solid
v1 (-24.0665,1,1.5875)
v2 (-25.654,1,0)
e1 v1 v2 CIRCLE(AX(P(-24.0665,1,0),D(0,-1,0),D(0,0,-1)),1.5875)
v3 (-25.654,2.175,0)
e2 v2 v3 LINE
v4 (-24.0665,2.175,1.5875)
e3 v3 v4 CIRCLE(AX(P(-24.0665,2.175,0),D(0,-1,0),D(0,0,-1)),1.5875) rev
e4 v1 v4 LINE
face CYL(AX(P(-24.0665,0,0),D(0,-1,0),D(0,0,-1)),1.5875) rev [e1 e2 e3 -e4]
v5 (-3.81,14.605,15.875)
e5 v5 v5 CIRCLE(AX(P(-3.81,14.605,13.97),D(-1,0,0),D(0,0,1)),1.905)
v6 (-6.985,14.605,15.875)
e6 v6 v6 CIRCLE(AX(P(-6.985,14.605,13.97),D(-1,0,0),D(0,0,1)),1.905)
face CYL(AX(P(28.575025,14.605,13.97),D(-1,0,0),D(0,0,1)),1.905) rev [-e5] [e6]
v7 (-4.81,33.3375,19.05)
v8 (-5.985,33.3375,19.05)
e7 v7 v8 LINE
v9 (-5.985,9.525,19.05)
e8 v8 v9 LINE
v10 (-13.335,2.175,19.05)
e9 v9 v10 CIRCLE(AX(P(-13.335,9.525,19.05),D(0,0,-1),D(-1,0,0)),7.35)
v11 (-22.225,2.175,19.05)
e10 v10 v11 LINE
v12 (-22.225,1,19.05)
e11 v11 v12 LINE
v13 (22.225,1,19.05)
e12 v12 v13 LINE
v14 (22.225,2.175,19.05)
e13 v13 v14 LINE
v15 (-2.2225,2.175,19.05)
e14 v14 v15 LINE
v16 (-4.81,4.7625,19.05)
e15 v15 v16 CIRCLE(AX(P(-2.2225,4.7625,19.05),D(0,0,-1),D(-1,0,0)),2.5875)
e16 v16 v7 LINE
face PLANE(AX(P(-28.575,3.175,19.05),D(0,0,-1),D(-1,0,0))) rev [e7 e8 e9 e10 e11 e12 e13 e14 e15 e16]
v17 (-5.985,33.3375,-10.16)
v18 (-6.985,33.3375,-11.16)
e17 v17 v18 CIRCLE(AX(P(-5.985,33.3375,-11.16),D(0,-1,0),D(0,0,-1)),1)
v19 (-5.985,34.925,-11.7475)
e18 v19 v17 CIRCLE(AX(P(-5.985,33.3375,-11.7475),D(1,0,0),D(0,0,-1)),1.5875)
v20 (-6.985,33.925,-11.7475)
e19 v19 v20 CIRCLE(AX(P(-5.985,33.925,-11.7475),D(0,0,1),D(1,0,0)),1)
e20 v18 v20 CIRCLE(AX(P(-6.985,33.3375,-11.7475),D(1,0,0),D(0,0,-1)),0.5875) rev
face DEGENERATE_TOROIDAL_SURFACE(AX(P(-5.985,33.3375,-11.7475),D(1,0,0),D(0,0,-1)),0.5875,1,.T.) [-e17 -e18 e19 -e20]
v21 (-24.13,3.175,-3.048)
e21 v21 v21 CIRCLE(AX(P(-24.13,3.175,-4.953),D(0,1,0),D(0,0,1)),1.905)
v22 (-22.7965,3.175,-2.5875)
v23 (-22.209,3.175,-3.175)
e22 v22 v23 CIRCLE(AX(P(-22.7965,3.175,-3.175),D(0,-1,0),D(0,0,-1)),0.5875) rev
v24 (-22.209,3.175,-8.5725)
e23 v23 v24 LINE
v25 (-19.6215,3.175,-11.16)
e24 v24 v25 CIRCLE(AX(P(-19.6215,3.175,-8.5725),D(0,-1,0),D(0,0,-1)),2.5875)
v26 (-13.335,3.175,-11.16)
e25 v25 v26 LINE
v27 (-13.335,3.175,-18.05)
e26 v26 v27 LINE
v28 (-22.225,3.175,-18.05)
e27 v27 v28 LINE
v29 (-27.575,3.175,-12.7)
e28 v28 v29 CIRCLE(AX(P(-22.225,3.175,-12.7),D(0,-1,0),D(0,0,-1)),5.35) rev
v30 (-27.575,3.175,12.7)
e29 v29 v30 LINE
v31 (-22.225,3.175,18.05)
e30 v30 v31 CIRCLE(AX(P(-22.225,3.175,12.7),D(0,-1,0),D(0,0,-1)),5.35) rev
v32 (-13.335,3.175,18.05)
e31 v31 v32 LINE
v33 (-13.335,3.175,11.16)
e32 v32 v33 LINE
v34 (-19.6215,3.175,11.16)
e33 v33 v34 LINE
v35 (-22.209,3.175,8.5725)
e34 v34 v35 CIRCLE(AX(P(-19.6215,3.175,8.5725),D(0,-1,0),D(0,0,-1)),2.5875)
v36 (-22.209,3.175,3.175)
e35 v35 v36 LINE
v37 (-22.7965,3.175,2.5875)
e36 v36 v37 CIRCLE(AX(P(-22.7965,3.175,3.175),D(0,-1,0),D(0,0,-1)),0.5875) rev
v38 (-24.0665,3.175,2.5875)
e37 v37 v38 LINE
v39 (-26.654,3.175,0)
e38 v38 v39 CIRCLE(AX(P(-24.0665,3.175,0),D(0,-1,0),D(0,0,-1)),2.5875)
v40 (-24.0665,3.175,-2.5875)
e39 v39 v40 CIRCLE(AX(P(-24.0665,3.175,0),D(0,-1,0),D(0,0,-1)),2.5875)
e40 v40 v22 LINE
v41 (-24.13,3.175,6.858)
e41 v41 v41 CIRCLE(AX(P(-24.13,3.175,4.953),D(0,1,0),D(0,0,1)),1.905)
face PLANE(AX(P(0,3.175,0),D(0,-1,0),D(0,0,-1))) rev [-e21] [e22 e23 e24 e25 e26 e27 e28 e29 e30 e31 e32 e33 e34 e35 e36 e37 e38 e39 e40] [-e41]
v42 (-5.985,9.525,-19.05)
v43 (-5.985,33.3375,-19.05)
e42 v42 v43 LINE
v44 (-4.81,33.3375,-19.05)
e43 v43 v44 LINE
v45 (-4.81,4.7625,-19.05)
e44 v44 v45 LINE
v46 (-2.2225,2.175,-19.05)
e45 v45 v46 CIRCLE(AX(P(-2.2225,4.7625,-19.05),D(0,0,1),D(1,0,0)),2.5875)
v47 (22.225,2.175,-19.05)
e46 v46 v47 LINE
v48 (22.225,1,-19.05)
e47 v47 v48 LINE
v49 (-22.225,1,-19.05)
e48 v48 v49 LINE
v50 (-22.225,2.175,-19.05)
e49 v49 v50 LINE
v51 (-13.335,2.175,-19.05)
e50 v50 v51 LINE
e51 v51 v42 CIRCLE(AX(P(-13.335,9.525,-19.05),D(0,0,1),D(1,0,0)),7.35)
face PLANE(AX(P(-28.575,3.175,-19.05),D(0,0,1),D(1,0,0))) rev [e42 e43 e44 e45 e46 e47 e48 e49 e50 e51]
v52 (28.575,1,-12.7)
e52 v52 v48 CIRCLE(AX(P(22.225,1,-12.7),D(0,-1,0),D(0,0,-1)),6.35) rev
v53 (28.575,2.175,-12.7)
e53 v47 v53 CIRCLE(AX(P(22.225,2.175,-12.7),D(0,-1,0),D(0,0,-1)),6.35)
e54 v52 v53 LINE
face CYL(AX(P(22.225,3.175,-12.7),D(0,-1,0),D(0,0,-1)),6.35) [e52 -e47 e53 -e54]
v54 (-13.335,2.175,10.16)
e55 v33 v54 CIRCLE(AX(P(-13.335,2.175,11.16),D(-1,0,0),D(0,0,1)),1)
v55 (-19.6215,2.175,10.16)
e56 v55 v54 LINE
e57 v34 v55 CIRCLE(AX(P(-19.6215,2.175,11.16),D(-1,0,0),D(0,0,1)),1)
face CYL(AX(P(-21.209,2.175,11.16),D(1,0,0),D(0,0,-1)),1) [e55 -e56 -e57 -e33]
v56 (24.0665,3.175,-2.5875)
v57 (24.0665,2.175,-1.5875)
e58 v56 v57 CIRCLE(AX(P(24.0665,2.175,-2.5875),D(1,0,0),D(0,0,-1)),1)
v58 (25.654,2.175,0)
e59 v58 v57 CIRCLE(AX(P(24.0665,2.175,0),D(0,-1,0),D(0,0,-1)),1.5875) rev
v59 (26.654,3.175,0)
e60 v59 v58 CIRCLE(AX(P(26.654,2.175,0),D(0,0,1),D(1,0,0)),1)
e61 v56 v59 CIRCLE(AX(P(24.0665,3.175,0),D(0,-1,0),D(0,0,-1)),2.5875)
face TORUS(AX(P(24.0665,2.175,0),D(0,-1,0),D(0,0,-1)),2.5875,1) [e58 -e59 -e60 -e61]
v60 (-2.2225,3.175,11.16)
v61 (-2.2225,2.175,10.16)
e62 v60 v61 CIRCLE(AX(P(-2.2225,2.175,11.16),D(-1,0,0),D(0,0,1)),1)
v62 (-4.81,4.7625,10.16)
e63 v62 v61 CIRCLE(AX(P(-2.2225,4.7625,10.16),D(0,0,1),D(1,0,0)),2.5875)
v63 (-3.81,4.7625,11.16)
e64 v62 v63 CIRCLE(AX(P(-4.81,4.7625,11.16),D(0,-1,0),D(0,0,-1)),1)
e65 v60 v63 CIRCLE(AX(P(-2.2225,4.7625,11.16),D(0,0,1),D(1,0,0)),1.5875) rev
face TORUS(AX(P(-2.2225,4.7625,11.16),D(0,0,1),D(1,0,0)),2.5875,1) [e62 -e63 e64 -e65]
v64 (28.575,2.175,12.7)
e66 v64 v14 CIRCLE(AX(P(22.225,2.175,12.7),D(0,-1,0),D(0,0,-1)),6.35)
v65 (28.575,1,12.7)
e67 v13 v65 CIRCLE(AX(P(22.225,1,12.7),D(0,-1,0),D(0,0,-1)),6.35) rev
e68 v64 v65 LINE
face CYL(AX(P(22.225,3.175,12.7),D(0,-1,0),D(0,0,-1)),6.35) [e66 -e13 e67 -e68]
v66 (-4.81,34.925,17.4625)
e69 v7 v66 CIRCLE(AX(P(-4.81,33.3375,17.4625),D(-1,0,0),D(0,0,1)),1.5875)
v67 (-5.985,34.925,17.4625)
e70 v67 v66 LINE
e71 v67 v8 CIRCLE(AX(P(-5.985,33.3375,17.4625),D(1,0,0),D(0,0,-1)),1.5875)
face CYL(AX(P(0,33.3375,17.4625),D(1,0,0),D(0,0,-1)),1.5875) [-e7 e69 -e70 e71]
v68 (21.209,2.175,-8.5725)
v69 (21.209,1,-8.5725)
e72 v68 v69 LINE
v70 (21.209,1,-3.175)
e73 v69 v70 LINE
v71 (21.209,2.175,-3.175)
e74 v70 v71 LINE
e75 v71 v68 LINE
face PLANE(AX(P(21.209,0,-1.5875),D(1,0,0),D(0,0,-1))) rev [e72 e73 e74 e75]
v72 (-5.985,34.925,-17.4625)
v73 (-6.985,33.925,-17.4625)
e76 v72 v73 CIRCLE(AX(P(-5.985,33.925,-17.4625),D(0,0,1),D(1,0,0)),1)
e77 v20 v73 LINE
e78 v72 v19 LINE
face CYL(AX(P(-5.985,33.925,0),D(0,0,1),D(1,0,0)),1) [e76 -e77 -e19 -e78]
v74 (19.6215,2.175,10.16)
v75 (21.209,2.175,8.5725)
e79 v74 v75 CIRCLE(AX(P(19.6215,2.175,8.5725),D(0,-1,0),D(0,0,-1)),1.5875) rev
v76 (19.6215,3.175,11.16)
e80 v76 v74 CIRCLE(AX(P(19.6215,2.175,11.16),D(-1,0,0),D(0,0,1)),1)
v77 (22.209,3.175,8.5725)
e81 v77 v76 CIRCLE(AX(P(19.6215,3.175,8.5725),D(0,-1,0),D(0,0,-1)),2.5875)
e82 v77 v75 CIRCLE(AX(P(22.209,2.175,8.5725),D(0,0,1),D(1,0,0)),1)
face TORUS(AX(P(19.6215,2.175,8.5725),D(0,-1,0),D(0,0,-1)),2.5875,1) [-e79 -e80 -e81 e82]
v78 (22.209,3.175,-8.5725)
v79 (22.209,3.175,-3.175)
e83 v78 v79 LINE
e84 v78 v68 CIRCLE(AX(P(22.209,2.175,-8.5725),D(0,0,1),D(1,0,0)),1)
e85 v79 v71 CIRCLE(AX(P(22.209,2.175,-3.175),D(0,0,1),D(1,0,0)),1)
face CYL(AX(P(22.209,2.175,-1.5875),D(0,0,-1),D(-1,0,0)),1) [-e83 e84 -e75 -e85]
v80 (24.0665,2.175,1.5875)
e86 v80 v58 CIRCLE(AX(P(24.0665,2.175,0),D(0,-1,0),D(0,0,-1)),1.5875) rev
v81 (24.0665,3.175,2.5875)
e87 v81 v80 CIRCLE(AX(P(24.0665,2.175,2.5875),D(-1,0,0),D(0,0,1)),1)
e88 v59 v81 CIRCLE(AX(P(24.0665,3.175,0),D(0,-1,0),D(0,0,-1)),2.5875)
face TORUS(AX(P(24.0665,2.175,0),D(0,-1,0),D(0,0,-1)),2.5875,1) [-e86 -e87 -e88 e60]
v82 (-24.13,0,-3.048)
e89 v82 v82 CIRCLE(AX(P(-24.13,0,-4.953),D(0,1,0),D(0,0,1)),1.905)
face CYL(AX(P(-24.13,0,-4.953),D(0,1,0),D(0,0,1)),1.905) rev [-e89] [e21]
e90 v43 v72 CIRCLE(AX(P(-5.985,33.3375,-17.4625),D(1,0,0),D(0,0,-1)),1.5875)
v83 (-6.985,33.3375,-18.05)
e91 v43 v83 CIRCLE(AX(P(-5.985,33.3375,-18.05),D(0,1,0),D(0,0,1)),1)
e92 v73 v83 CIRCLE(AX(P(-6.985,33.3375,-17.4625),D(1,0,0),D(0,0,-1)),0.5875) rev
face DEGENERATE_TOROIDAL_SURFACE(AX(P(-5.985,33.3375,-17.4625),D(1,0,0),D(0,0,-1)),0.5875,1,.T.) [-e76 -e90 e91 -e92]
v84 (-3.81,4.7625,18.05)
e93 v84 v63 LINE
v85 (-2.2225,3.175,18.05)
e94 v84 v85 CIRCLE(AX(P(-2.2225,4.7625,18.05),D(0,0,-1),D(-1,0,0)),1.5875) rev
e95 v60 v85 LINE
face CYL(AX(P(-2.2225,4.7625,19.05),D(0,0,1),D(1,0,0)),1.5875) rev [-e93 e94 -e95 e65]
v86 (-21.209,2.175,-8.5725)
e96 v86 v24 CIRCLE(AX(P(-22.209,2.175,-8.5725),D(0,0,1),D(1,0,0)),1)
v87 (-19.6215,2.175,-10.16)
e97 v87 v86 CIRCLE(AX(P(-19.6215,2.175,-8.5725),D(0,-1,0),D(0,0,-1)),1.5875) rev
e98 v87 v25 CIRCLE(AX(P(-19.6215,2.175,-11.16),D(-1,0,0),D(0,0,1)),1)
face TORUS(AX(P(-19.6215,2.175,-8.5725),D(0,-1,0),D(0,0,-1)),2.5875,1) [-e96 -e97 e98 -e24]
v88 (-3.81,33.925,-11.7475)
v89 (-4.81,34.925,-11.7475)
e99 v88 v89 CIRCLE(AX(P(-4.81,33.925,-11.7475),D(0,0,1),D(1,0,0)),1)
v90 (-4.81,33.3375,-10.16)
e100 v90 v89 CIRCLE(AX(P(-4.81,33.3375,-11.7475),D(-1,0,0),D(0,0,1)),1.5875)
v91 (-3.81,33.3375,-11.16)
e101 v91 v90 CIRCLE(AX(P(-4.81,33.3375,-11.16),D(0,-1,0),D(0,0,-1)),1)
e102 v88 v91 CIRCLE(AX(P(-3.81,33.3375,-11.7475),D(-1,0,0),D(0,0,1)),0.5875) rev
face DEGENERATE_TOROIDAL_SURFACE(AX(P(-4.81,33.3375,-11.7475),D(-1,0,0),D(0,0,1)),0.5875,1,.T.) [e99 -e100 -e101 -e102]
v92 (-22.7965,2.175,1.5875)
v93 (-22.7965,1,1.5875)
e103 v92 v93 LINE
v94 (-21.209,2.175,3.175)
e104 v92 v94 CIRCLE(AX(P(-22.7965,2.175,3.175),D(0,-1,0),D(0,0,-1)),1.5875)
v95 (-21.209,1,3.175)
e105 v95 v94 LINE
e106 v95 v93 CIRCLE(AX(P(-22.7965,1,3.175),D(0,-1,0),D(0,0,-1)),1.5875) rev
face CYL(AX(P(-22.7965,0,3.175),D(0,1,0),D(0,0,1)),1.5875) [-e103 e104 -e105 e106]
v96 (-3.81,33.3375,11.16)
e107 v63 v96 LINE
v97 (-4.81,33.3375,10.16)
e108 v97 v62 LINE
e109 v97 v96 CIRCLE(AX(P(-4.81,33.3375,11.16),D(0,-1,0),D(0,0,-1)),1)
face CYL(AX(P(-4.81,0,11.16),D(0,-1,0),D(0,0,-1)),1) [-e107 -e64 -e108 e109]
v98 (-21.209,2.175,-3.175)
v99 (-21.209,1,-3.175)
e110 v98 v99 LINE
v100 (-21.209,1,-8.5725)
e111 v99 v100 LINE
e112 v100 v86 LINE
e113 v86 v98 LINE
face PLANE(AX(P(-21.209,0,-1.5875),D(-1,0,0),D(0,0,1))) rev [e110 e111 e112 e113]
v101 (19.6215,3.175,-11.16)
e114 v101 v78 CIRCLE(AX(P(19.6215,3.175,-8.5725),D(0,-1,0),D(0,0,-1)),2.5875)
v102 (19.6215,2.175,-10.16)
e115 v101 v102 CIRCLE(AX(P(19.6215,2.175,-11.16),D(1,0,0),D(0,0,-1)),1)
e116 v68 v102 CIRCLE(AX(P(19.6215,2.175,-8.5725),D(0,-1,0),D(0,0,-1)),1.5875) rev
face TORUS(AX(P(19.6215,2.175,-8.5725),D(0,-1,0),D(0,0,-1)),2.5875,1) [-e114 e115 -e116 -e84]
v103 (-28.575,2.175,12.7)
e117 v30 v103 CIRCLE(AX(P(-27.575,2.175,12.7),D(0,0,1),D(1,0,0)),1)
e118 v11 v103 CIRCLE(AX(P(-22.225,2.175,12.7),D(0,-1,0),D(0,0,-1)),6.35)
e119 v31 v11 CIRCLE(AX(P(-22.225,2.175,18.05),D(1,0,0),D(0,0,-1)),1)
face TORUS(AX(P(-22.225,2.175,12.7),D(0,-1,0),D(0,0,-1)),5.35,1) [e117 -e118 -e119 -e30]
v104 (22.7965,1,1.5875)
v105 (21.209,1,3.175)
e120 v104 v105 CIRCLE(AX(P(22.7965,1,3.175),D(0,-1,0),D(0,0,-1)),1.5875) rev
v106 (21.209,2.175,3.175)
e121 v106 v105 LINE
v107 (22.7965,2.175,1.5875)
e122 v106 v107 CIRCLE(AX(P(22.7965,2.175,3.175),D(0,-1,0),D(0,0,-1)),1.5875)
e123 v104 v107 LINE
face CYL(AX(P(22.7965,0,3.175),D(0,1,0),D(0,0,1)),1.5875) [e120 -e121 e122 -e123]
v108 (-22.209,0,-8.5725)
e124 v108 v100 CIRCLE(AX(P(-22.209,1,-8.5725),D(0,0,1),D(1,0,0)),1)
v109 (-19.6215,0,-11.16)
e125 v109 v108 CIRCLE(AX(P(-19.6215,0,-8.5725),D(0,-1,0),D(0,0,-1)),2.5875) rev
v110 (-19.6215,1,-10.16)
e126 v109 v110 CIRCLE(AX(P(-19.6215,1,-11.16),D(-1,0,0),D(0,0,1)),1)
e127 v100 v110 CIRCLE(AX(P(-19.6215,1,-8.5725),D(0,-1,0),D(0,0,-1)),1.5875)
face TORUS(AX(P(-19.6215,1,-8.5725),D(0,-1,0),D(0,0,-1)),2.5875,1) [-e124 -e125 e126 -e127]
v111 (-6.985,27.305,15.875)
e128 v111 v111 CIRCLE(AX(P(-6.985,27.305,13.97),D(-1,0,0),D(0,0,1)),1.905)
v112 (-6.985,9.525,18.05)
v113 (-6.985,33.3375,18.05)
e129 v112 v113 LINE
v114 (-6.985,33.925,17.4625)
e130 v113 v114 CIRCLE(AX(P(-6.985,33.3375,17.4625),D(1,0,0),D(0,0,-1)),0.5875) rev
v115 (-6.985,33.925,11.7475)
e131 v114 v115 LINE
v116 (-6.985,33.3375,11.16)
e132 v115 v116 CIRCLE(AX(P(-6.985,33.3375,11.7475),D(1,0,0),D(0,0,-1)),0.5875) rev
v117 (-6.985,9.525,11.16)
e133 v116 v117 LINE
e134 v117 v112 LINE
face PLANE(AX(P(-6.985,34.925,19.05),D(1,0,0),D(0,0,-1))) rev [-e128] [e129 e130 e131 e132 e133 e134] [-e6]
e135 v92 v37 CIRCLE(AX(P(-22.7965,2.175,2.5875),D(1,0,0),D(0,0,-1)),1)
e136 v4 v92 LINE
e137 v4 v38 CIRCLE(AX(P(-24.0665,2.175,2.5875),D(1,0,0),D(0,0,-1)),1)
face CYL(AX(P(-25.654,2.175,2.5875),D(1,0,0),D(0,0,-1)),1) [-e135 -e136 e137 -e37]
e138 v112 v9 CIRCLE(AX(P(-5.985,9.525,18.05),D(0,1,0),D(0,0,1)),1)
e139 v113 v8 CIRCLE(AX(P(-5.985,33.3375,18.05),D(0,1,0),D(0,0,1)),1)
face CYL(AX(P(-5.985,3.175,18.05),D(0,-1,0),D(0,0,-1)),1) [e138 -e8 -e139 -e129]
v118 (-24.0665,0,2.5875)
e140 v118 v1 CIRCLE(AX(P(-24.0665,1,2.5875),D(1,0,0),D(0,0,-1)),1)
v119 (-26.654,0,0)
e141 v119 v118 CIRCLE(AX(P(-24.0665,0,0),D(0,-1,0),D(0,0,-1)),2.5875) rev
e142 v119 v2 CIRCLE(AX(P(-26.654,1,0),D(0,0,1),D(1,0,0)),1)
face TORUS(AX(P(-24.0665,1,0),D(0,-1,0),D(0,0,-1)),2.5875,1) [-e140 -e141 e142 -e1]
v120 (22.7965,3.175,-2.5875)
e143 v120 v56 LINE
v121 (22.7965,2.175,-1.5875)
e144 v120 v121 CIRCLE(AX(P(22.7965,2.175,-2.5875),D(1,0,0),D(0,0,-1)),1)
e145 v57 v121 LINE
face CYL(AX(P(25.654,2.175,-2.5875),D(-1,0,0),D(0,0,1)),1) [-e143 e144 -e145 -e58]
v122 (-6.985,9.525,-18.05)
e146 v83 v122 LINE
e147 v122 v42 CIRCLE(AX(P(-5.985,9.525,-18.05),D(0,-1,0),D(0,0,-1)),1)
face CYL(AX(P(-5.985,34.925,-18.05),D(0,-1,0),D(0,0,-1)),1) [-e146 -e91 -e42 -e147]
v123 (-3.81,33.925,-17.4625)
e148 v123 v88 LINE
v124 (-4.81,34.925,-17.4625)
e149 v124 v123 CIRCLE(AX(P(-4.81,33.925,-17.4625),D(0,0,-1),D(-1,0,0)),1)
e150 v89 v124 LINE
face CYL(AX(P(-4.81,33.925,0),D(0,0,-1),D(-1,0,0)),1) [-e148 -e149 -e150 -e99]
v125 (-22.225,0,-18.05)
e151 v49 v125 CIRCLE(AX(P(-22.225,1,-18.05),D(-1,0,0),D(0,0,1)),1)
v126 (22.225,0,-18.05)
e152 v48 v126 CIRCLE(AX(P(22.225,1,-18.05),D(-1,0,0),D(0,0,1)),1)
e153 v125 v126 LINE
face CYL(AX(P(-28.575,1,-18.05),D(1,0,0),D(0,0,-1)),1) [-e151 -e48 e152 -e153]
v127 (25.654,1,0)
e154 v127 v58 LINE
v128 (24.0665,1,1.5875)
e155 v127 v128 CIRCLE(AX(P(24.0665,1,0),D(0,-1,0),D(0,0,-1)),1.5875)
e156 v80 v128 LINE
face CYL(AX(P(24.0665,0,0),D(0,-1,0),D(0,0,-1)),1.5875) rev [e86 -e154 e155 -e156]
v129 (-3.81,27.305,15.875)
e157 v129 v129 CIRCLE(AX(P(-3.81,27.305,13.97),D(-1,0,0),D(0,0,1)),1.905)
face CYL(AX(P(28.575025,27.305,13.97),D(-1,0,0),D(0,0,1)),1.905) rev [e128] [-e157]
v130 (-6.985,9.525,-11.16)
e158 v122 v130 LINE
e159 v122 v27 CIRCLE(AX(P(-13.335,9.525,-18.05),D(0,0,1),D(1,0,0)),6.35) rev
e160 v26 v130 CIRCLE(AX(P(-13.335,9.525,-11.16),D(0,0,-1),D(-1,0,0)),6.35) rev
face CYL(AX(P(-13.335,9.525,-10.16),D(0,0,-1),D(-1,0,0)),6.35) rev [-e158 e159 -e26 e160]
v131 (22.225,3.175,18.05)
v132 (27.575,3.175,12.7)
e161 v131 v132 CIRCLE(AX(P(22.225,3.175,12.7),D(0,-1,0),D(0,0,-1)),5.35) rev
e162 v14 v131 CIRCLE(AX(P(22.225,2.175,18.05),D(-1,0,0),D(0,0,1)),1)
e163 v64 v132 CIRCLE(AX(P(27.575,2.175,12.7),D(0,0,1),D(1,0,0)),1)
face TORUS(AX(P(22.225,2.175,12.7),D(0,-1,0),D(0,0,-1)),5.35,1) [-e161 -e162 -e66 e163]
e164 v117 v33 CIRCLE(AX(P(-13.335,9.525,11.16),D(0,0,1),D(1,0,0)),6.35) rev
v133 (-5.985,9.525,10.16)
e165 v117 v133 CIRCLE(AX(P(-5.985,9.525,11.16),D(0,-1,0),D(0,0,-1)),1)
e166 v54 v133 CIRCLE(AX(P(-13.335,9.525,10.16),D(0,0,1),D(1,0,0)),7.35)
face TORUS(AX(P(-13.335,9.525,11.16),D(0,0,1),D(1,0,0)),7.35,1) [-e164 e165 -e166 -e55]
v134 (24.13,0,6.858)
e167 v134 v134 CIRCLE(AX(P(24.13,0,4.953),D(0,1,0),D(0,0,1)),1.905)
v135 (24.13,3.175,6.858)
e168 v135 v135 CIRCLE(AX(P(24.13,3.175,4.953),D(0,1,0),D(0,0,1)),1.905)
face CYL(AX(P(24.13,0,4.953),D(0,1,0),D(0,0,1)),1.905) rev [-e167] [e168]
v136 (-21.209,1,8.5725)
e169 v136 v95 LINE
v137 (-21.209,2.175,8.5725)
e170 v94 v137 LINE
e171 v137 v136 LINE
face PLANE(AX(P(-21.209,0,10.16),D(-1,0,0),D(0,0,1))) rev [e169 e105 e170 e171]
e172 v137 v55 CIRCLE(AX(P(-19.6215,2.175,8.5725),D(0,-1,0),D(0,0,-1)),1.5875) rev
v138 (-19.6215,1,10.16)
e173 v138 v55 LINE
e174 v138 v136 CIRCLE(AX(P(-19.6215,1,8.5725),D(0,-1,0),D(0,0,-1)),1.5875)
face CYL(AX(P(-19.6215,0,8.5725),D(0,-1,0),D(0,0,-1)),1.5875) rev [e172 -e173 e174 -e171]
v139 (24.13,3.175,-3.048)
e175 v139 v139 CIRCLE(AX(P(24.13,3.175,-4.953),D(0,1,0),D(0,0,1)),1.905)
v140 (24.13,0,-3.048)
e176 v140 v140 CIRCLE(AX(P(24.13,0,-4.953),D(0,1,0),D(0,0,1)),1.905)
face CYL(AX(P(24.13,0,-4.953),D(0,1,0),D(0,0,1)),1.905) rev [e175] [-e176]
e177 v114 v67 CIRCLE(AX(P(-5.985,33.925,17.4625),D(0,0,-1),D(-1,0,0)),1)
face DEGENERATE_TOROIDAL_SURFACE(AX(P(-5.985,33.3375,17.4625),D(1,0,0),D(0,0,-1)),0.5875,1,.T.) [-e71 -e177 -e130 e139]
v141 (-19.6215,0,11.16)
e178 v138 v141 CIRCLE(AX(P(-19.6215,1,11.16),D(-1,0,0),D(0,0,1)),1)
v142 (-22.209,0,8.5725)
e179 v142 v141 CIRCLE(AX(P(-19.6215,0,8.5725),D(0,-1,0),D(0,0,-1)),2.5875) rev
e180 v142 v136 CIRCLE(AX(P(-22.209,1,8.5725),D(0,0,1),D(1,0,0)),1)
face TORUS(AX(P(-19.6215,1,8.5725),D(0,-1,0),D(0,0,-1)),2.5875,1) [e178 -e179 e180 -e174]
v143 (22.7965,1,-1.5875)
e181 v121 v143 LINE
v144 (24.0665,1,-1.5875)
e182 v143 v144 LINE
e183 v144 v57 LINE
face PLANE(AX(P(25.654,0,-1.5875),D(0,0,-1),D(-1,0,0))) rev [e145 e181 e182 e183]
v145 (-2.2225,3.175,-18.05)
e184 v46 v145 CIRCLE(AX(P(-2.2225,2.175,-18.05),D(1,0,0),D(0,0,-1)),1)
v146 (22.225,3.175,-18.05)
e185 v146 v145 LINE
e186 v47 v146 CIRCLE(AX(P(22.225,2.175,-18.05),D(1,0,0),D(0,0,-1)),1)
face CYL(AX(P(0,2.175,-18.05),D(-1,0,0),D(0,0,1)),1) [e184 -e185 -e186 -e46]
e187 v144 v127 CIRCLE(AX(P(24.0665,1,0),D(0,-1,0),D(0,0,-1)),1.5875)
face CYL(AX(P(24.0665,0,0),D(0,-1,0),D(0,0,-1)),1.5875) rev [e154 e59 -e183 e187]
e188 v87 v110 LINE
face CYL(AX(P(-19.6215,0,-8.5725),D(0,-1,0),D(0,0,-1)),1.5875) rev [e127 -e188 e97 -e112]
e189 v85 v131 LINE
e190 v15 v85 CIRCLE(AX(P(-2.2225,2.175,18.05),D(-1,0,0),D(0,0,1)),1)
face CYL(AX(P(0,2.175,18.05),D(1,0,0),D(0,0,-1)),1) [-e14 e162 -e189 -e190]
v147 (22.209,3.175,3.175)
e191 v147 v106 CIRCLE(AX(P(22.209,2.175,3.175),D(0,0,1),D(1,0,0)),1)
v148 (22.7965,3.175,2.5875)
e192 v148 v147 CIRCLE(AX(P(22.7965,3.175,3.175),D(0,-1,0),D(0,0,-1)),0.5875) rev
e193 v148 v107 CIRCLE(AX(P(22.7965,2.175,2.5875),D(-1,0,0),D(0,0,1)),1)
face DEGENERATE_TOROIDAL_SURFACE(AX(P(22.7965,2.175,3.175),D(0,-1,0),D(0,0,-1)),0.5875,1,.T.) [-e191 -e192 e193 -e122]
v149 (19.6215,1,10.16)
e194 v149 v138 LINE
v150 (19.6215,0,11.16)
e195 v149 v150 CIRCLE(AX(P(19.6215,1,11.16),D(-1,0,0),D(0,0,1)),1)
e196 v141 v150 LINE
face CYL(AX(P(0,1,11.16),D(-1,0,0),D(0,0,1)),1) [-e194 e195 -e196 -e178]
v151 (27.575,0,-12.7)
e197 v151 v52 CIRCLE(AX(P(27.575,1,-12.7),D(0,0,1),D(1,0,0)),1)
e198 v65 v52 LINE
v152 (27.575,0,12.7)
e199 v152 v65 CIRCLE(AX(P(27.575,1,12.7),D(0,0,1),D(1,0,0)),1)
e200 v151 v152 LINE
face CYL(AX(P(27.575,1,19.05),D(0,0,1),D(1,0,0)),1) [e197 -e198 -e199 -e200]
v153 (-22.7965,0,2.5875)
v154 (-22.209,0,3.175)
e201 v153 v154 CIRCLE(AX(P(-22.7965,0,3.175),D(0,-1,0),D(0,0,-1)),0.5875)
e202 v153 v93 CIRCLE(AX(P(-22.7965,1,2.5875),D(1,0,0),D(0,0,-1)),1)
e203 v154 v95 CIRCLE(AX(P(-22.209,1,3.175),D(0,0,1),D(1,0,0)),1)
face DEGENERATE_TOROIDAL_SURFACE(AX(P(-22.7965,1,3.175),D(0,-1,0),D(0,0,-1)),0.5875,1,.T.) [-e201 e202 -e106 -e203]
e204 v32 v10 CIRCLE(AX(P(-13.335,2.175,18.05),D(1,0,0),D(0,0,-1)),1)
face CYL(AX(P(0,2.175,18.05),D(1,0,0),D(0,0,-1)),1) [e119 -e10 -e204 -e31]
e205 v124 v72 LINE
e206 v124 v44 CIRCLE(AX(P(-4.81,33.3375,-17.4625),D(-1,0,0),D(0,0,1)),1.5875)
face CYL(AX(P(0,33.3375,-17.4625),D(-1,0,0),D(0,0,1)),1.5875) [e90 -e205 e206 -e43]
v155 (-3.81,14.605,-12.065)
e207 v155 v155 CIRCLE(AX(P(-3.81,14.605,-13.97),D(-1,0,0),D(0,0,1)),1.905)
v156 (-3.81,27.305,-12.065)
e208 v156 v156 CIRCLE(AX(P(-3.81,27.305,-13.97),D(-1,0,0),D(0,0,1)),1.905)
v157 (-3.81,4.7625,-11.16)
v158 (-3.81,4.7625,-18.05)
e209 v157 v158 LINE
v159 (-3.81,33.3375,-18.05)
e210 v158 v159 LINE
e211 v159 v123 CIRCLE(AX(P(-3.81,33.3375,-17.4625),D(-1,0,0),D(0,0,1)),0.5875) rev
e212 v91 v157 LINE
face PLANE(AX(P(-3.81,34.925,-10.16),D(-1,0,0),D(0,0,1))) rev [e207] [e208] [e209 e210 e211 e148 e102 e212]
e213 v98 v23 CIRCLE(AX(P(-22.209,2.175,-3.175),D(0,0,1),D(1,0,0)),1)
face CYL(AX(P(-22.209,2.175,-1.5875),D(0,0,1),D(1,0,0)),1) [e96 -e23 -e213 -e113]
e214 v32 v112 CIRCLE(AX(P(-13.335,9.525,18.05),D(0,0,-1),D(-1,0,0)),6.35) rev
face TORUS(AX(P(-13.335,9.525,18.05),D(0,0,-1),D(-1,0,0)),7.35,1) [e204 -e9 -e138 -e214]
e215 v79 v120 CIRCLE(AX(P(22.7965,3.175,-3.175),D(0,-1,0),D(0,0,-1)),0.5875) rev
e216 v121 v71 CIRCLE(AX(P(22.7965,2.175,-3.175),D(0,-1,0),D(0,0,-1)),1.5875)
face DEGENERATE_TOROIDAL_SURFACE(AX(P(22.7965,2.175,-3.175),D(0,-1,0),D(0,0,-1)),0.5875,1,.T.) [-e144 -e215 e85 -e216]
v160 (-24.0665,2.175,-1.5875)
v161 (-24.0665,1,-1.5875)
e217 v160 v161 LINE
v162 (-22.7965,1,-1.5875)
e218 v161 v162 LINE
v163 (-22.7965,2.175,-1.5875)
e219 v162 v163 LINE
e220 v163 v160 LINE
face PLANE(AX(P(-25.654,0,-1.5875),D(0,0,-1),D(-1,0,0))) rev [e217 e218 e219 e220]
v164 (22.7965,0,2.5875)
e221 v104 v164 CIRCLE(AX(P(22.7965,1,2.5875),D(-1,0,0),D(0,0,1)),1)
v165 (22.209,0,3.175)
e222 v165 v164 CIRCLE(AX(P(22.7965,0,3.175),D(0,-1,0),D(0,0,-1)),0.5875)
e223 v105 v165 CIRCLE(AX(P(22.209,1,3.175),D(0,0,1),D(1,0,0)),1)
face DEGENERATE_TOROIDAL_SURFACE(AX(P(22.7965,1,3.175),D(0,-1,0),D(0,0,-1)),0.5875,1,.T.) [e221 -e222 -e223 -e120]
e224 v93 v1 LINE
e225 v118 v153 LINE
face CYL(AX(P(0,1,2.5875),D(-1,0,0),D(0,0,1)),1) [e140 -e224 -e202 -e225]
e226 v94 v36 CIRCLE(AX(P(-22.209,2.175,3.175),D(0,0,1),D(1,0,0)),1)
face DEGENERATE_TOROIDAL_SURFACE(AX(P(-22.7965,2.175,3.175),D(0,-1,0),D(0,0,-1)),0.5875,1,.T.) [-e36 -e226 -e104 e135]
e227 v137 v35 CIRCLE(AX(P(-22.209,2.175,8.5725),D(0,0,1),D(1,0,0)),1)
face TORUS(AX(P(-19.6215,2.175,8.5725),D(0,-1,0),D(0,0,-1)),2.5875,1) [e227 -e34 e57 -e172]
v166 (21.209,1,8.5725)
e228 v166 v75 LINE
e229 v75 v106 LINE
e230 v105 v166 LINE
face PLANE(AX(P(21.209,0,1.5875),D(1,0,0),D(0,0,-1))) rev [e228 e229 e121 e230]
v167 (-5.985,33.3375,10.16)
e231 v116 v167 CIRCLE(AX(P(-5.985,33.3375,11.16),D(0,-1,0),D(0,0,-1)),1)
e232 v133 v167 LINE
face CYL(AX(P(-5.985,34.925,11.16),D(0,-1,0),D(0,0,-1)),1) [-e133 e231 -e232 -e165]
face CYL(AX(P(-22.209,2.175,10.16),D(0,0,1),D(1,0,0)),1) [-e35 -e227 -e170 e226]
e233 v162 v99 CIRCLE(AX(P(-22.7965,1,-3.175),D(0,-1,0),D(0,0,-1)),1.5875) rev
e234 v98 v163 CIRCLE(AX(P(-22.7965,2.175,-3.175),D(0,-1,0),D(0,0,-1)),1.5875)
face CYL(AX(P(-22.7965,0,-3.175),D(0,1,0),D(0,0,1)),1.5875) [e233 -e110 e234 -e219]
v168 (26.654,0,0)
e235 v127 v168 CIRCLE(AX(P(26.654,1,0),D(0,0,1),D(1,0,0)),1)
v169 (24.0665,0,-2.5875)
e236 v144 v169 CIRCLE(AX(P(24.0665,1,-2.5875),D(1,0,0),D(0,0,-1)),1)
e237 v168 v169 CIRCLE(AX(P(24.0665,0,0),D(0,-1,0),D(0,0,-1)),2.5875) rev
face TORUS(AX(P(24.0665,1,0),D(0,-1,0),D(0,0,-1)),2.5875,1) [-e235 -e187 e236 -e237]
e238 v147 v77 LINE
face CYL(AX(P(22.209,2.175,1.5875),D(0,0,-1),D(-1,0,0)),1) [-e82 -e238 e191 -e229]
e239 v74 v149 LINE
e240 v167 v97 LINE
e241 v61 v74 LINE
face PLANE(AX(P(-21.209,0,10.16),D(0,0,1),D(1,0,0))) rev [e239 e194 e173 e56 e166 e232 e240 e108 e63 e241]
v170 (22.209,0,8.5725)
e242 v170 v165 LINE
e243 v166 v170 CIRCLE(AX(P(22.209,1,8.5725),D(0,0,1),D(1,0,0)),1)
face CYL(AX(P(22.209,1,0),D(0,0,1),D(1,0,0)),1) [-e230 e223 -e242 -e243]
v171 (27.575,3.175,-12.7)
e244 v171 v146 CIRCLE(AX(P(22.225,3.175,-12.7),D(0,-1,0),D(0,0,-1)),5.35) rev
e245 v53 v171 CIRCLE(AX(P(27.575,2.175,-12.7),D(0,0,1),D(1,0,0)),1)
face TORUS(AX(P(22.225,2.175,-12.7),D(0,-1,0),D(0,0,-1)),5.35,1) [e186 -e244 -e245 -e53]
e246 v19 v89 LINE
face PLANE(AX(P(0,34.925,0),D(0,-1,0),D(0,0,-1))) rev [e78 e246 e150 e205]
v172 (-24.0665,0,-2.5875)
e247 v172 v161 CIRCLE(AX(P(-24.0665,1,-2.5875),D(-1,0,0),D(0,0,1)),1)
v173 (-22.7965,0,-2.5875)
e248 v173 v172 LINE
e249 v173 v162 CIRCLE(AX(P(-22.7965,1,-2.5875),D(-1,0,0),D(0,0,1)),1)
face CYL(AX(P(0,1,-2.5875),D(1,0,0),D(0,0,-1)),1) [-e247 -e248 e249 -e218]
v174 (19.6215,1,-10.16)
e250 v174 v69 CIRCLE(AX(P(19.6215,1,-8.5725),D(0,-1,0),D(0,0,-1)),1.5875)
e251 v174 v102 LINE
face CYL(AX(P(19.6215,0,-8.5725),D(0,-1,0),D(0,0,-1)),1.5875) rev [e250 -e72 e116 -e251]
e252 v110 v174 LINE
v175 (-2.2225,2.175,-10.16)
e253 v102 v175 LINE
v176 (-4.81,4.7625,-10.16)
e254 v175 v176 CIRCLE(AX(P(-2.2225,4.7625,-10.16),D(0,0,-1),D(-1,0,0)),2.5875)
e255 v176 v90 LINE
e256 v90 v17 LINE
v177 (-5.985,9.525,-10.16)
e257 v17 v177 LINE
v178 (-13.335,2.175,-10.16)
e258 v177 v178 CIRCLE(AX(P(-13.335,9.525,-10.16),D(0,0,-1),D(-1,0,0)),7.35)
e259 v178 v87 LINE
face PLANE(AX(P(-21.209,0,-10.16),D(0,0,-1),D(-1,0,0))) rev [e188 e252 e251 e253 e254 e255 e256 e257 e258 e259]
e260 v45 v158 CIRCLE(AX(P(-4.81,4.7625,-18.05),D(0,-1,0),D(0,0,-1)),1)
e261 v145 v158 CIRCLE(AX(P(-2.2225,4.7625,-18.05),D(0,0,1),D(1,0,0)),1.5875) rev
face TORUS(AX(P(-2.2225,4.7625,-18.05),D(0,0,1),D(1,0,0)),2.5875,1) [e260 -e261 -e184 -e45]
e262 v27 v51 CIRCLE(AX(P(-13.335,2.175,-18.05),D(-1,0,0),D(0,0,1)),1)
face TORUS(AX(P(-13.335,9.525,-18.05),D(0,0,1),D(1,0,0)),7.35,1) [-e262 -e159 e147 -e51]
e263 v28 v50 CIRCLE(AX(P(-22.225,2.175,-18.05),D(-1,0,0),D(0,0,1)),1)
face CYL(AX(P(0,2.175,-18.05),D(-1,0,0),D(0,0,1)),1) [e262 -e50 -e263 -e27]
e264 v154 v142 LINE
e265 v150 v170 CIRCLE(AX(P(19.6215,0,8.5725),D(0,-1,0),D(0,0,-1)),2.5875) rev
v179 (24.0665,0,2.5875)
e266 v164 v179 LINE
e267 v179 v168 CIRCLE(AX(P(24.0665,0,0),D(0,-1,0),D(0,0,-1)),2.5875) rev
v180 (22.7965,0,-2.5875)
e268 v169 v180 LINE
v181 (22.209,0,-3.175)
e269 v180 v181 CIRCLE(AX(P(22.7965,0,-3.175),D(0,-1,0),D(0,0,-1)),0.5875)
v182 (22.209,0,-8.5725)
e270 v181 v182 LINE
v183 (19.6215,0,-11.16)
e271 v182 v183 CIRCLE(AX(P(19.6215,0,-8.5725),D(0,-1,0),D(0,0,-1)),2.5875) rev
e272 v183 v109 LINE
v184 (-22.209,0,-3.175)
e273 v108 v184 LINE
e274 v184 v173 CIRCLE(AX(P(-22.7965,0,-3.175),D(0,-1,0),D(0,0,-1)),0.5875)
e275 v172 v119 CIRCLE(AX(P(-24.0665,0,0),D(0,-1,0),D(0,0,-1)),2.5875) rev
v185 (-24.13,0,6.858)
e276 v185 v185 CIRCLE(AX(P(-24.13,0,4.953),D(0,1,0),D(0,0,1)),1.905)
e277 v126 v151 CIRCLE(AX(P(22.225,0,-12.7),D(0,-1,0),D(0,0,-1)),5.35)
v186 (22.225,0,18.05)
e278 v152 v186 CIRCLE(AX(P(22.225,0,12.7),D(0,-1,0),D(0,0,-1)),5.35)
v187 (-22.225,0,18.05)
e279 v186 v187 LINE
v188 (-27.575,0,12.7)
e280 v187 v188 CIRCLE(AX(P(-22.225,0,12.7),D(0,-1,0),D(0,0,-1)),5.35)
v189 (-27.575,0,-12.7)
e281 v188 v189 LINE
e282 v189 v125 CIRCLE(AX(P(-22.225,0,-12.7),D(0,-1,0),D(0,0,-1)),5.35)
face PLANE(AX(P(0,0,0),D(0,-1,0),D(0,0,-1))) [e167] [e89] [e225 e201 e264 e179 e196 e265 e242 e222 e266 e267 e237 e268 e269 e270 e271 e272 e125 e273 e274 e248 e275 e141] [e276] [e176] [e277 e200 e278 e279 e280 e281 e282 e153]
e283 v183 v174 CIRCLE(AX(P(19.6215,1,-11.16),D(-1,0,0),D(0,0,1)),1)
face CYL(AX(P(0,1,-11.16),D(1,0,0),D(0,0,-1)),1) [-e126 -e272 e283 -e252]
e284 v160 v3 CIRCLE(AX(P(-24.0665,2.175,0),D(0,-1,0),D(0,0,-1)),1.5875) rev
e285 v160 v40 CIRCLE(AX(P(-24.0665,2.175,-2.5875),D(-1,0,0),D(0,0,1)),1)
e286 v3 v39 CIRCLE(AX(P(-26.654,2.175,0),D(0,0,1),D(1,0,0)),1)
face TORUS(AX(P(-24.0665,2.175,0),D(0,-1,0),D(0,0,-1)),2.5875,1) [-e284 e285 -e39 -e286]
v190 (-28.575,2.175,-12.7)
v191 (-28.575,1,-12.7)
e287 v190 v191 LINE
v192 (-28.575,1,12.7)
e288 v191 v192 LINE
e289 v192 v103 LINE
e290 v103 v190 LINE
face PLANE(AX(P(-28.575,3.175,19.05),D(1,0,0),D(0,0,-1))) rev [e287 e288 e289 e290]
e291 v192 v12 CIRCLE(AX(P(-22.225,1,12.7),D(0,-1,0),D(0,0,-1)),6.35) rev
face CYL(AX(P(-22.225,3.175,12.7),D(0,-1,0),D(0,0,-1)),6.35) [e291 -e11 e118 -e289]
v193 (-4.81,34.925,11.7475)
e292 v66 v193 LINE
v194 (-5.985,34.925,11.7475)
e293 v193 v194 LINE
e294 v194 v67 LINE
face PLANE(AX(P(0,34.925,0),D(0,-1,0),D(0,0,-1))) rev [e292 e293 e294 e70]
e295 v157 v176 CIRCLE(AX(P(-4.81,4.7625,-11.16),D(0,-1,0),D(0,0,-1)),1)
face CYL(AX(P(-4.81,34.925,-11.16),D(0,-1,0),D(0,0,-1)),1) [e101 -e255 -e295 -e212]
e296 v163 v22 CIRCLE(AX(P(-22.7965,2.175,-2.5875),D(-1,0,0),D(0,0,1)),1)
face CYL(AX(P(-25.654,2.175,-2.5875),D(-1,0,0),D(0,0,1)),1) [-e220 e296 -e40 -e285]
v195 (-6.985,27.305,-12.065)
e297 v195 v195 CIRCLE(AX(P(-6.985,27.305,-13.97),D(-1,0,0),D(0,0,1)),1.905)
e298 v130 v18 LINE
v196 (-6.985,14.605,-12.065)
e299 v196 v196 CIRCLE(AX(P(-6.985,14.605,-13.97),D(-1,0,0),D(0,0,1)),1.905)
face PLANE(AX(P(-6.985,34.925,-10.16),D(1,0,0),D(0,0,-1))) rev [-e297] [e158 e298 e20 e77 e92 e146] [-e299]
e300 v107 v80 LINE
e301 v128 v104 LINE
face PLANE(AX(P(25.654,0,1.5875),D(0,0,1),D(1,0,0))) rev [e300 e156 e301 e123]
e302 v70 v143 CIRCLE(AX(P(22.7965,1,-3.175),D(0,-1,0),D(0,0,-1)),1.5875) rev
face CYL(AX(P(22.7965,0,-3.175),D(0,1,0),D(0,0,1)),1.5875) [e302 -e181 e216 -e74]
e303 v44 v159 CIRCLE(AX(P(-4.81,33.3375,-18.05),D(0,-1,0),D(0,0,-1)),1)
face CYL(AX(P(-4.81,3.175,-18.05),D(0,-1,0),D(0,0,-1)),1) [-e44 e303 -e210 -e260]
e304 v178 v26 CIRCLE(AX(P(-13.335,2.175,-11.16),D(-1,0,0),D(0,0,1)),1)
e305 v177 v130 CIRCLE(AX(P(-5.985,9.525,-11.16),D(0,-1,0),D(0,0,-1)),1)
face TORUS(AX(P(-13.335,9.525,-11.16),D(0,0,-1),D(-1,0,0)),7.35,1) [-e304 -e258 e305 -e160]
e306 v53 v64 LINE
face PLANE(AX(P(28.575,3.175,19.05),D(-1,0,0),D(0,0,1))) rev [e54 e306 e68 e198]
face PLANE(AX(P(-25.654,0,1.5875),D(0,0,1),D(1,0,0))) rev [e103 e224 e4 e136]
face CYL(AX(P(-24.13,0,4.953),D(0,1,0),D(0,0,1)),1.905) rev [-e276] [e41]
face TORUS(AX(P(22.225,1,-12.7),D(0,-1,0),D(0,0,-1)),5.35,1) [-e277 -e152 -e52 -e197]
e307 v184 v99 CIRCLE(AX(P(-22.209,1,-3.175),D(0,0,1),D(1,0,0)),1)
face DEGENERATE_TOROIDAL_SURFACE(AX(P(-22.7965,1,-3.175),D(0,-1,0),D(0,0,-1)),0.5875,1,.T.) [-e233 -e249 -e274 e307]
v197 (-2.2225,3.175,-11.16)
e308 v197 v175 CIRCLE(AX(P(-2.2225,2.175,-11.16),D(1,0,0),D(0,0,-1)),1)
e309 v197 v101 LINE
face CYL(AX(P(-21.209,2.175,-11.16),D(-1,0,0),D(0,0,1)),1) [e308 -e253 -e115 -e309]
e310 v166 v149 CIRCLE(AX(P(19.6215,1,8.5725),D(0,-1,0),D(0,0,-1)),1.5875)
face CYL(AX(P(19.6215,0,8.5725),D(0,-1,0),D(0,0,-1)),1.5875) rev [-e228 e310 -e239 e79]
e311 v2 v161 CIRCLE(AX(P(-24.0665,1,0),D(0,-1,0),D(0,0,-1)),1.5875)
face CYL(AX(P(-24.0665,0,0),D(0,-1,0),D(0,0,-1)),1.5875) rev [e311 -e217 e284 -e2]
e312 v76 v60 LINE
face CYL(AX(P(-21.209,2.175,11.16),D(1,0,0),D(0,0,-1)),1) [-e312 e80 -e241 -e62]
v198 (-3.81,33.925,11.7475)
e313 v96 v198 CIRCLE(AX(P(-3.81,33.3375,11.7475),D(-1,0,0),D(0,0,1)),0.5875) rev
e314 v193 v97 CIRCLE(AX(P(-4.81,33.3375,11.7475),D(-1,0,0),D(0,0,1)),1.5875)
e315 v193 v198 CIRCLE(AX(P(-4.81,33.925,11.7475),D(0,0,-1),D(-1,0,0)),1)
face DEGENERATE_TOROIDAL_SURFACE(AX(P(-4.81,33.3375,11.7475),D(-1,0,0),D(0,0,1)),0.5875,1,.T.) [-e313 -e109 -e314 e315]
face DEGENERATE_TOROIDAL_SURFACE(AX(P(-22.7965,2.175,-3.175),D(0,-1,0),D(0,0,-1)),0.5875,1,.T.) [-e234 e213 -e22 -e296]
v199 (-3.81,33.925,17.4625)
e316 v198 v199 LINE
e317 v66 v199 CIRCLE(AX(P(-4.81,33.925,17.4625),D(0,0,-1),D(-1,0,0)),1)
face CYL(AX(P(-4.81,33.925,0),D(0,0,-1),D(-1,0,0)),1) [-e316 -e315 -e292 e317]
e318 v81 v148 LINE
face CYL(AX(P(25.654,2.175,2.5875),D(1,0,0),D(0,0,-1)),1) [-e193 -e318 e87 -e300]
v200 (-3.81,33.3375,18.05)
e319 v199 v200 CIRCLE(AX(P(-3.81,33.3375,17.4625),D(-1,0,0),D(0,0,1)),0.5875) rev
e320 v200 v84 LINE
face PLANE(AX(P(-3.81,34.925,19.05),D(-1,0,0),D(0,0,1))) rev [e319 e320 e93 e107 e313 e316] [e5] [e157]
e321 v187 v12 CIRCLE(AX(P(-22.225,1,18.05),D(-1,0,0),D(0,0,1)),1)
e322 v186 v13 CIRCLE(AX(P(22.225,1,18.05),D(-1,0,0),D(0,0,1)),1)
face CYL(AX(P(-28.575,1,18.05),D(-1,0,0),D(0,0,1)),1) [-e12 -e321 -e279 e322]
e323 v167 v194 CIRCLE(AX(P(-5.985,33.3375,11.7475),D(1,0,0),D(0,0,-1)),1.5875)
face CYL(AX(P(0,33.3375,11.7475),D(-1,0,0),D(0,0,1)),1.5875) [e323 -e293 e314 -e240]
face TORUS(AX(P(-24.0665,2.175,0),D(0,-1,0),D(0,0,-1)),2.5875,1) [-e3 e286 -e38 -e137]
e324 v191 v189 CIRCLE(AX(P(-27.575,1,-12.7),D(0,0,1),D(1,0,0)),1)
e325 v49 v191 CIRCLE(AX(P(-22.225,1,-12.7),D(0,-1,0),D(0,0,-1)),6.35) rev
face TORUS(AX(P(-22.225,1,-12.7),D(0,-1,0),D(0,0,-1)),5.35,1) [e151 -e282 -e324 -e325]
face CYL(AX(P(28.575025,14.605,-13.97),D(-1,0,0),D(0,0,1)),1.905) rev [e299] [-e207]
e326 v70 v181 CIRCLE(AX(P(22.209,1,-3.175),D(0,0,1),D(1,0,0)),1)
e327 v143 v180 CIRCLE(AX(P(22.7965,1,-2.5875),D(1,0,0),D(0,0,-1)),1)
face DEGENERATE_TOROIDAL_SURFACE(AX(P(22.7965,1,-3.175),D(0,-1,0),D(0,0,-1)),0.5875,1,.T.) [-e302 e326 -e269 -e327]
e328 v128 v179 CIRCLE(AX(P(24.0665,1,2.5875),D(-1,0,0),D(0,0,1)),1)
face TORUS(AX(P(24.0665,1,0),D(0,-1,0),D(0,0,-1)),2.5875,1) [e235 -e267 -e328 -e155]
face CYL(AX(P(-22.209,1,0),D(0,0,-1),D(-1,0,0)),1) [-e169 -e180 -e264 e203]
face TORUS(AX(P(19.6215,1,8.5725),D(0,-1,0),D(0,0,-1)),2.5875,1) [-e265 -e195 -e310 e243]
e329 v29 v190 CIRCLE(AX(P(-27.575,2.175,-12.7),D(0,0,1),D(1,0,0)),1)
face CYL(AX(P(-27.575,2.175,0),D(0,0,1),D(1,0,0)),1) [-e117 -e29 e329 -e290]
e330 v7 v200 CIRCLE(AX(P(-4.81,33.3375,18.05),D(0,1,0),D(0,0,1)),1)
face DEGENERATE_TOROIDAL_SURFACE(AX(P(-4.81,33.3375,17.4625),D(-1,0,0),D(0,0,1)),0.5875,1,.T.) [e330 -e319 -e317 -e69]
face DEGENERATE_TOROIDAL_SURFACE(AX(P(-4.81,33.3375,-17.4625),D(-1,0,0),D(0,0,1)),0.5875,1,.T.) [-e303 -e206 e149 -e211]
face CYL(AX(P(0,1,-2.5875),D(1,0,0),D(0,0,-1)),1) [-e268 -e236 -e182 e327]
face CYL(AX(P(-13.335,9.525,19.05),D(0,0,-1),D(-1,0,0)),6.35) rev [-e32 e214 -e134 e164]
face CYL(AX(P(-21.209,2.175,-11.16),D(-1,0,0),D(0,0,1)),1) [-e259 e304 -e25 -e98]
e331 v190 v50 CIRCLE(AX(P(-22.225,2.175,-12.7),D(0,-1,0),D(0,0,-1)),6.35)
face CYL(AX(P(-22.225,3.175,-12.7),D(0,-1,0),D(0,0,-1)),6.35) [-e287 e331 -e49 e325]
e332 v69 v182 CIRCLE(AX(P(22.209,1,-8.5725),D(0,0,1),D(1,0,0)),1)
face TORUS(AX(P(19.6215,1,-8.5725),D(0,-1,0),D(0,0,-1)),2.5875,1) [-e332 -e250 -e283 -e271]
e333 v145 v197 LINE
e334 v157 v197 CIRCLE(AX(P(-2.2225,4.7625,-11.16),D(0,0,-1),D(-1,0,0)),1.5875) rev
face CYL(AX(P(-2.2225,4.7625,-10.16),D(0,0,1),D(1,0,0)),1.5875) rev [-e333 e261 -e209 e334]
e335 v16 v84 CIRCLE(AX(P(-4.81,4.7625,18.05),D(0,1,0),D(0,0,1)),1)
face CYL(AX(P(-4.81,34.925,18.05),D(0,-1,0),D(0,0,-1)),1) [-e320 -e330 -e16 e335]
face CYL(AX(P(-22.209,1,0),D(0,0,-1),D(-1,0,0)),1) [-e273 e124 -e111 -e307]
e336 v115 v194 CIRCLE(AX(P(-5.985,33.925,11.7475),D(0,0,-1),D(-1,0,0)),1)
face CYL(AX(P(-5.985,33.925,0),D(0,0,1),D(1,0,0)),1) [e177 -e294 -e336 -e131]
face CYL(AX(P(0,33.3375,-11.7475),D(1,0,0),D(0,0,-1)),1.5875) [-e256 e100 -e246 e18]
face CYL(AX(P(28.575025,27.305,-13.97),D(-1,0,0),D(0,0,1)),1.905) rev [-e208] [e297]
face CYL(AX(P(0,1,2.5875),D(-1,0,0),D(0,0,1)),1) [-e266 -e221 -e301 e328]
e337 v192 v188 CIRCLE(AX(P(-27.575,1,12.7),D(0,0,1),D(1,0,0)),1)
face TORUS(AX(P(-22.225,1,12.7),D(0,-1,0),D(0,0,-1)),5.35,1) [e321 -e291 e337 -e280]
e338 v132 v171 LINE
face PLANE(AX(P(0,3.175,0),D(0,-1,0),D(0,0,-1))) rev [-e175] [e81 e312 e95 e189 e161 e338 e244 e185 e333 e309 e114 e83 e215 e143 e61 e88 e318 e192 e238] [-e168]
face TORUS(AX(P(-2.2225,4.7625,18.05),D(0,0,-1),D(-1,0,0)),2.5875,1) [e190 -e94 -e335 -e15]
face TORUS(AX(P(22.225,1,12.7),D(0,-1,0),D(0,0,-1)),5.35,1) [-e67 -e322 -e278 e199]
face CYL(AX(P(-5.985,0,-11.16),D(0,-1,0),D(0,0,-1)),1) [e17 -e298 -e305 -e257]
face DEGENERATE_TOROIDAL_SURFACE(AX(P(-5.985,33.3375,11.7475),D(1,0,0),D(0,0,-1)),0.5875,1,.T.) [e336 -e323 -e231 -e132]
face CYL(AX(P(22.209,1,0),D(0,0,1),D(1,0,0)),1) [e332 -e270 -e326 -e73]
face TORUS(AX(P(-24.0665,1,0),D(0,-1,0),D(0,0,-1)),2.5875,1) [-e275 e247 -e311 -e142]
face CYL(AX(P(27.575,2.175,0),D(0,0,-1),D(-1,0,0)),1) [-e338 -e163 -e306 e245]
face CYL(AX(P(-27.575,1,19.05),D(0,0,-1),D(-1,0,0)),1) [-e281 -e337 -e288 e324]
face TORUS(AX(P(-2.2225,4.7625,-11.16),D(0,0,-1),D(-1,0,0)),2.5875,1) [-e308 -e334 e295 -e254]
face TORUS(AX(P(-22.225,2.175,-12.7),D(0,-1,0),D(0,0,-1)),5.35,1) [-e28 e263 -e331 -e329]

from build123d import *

# Parameters (mm, degrees)
SKETCH1_W           = 57.15
SKETCH1_H           = 38.1
BOSS_EXTRUDE1_DEPTH = 3.175
SKETCH2_R           = 1.905
CUT_EXTRUDE1_DEPTH  = 35.48932806
SKETCH3_W           = 3.175
SKETCH3_H           = 8.89
BOSS_EXTRUDE2_DEPTH = 31.75
SKETCH4_R           = 1.905
CUT_EXTRUDE2_DEPTH  = 54.358895463
FILLET1_R           = 1.5875
FILLET2_R           = 6.35
FILLET3_R           = 1


with BuildPart() as part:
    # Sketch1 → Boss-Extrude1 (new body)
    with BuildSketch(Plane(origin=(0, 0, 0), x_dir=(1, 0, 0), z_dir=(0, 1, 0))):
        Rectangle(SKETCH1_W, SKETCH1_H)
    extrude(amount=BOSS_EXTRUDE1_DEPTH)

    # Sketch2 → Cut-Extrude1 (cut, through all)
    with BuildSketch(Plane(origin=(0, 3.175, 0), x_dir=(1, 0, 0), z_dir=(0, 1, 0))):
        with Locations(Location((-24.13, -4.953, 0), (0, 0, 270))):
            Circle(SKETCH2_R)
        with Locations(Location((-24.13, 4.953, 0), (0, 0, 270))):
            Circle(SKETCH2_R)
        with Locations(Location((24.13, 4.953, 0), (0, 0, 270))):
            Circle(SKETCH2_R)
        with Locations(Location((24.13, -4.953, 0), (0, 0, 270))):
            Circle(SKETCH2_R)
        Polygon((-21.209, -10.16), (21.209, -10.16), (21.209, -1.5875), (25.654, -1.5875), (25.654, 1.5875), (21.209, 1.5875), (21.209, 10.16), (-21.209, 10.16), (-21.209, 1.5875), (-25.654, 1.5875), (-25.654, -1.5875), (-21.209, -1.5875), align=None)
    extrude(amount=-CUT_EXTRUDE1_DEPTH, mode=Mode.SUBTRACT)

    # Sketch3 → Boss-Extrude2 (add)
    with BuildSketch(Plane(origin=(0, 3.175, 0), x_dir=(1, 0, 0), z_dir=(0, 1, 0))):
        with Locations((-5.3975, -14.605)):
            Rectangle(SKETCH3_W, SKETCH3_H)
        with Locations((-5.3975, 14.605)):
            Rectangle(SKETCH3_W, SKETCH3_H)
    extrude(amount=BOSS_EXTRUDE2_DEPTH)

    # Sketch4 → Cut-Extrude2 (cut, through all)
    with BuildSketch(Plane.ZY.offset(6.985)):
        with Locations((13.97, 27.305)):
            Circle(SKETCH4_R)
        with Locations((-13.97, 27.305)):
            Circle(SKETCH4_R)
        with Locations((-13.97, 14.605)):
            Circle(SKETCH4_R)
        with Locations((13.97, 14.605)):
            Circle(SKETCH4_R)
    extrude(amount=-CUT_EXTRUDE2_DEPTH, mode=Mode.SUBTRACT)

    # Fillet1
    fillet1_edges = [part.edges().sort_by_distance(p)[0] for p in [
        (-3.81, 3.175, -14.605),
        (-3.81, 3.175, 14.605),
        (-21.209, 1.5875, -10.16),
        (-21.209, 1.5875, 10.16),
        (-21.209, 1.5875, -1.5875),
        (-21.209, 1.5875, 1.5875),
        (-25.654, 1.5875, 1.5875),
        (-25.654, 1.5875, -1.5875),
        (21.209, 1.5875, -10.16),
        (21.209, 1.5875, -1.5875),
        (25.654, 1.5875, -1.5875),
        (25.654, 1.5875, 1.5875),
        (21.209, 1.5875, 1.5875),
        (21.209, 1.5875, 10.16),
        (-5.3975, 34.925, -10.16),
        (-5.3975, 34.925, -19.05),
        (-5.3975, 34.925, 19.05),
        (-5.3975, 34.925, 10.16),
    ]]
    fillet(fillet1_edges, radius=FILLET1_R - 0.0001)  # a hair under: the kernel refuses the full size

    # Fillet2
    fillet2_edges = [part.edges().sort_by_distance(p)[0] for p in [
        (-6.985, 3.175, -14.605),
        (-6.985, 3.175, 14.605),
        (28.575, 1.5875, 19.05),
        (28.575, 1.5875, -19.05),
        (-28.575, 1.5875, -19.05),
        (-28.575, 1.5875, 19.05),
    ]]
    fillet(fillet2_edges, radius=FILLET2_R)

    # Fillet3
    fillet3_edges = [part.edges().sort_by_distance(p)[0] for p in [
        (-6.985, 34.925, -14.605),
        (-3.81, 34.925, -14.605),
        (-3.81, 19.05, -19.05),
        (-3.81, 19.05, -10.16),
        (-3.81, 34.460061304, -18.585061304),
        (-3.81, 34.460061304, -10.624938696),
        (8.6995, 3.175, -10.16),
        (-6.985, 21.4313, -10.16),
        (0, 0, -10.16),
        (-6.985, 21.4313, -19.05),
        (-6.985, 34.460061304, -18.585061304),
        (-6.985, 34.460061304, -10.624938696),
        (-6.985, 34.925, 14.605),
        (-3.81, 34.925, 14.605),
        (-3.81, 19.05, 10.16),
        (-3.81, 19.05, 19.05),
        (-3.81, 34.460061304, 10.624938696),
        (-3.81, 34.460061304, 18.585061304),
        (10.0012, 3.175, 19.05),
        (-6.985, 21.4313, 19.05),
        (-6.985, 21.4313, 10.16),
        (-6.985, 34.460061304, 10.624938696),
        (-6.985, 34.460061304, 18.585061304),
        (-16.4783, 3.175, 10.16),
        (8.6995, 3.175, 10.16),
        (0, 0, 10.16),
        (21.209, 3.175, -5.87375),
        (23.4315, 3.175, -1.5875),
        (23.4315, 3.175, 1.5875),
        (21.209, 3.175, 5.87375),
        (21.673938696, 3.175, 2.052438696),
        (21.673938696, 3.175, -2.052438696),
        (-21.209, 3.175, -5.87375),
        (-21.209, 0, -5.87375),
        (-21.209, 3.175, 5.87375),
        (-21.209, 0, 5.87375),
        (-23.4315, 3.175, -1.5875),
        (-23.4315, 0, -1.5875),
        (-23.4315, 3.175, 1.5875),
        (-21.673938696, 3.175, 2.052438696),
        (-21.673938696, 3.175, -2.052438696),
        (21.209, 0, -5.87375),
        (-23.4315, 0, 1.5875),
        (21.209, 0, 5.87375),
        (23.4315, 0, 1.5875),
        (23.4315, 0, -1.5875),
        (21.673938696, 0, 2.052438696),
        (21.673938696, 0, -2.052438696),
        (-21.673938696, 0, 2.052438696),
        (-21.673938696, 0, -2.052438696),
        (-3.345061304, 3.639938696, -19.05),
        (-3.345061304, 3.639938696, -10.16),
        (-3.345061304, 3.639938696, 10.16),
        (-3.345061304, 3.639938696, 19.05),
        (-20.744061304, 3.175, -9.695061304),
        (-20.744061304, 0, -9.695061304),
        (-20.744061304, 3.175, 9.695061304),
        (-20.744061304, 0, 9.695061304),
        (-25.189061304, 3.175, 1.122561304),
        (-25.189061304, 0, 1.122561304),
        (-25.189061304, 3.175, -1.122561304),
        (-25.189061304, 0, -1.122561304),
        (20.744061304, 3.175, -9.695061304),
        (20.744061304, 0, -9.695061304),
        (25.189061304, 3.175, -1.122561304),
        (25.189061304, 0, -1.122561304),
        (25.189061304, 3.175, 1.122561304),
        (25.189061304, 0, 1.122561304),
        (20.744061304, 3.175, 9.695061304),
        (20.744061304, 0, 9.695061304),
        (28.575, 0, 0),
        (28.575, 3.175, 0),
        (0, 0, 19.05),
        (-28.575, 0, 0),
        (0, 0, -19.05),
        (-26.715128061, 0, 17.190128061),
        (-26.715128061, 0, -17.190128061),
        (26.715128061, 0, -17.190128061),
        (26.715128061, 0, 17.190128061),
        (-17.78, 3.175, 19.05),
        (10.0012, 3.175, -19.05),
        (26.715128061, 3.175, -17.190128061),
        (26.715128061, 3.175, 17.190128061),
        (-17.78, 3.175, -19.05),
        (-28.575, 3.175, 0),
        (-16.4783, 3.175, -10.16),
        (-26.715128061, 3.175, 17.190128061),
        (-26.715128061, 3.175, -17.190128061),
        (-8.844871939, 5.034871939, -10.16),
        (-8.844871939, 5.034871939, -19.05),
        (-8.844871939, 5.034871939, 19.05),
        (-8.844871939, 5.034871939, 10.16),
    ]]
    fillet(fillet3_edges, radius=FILLET3_R)


solid = part.part
